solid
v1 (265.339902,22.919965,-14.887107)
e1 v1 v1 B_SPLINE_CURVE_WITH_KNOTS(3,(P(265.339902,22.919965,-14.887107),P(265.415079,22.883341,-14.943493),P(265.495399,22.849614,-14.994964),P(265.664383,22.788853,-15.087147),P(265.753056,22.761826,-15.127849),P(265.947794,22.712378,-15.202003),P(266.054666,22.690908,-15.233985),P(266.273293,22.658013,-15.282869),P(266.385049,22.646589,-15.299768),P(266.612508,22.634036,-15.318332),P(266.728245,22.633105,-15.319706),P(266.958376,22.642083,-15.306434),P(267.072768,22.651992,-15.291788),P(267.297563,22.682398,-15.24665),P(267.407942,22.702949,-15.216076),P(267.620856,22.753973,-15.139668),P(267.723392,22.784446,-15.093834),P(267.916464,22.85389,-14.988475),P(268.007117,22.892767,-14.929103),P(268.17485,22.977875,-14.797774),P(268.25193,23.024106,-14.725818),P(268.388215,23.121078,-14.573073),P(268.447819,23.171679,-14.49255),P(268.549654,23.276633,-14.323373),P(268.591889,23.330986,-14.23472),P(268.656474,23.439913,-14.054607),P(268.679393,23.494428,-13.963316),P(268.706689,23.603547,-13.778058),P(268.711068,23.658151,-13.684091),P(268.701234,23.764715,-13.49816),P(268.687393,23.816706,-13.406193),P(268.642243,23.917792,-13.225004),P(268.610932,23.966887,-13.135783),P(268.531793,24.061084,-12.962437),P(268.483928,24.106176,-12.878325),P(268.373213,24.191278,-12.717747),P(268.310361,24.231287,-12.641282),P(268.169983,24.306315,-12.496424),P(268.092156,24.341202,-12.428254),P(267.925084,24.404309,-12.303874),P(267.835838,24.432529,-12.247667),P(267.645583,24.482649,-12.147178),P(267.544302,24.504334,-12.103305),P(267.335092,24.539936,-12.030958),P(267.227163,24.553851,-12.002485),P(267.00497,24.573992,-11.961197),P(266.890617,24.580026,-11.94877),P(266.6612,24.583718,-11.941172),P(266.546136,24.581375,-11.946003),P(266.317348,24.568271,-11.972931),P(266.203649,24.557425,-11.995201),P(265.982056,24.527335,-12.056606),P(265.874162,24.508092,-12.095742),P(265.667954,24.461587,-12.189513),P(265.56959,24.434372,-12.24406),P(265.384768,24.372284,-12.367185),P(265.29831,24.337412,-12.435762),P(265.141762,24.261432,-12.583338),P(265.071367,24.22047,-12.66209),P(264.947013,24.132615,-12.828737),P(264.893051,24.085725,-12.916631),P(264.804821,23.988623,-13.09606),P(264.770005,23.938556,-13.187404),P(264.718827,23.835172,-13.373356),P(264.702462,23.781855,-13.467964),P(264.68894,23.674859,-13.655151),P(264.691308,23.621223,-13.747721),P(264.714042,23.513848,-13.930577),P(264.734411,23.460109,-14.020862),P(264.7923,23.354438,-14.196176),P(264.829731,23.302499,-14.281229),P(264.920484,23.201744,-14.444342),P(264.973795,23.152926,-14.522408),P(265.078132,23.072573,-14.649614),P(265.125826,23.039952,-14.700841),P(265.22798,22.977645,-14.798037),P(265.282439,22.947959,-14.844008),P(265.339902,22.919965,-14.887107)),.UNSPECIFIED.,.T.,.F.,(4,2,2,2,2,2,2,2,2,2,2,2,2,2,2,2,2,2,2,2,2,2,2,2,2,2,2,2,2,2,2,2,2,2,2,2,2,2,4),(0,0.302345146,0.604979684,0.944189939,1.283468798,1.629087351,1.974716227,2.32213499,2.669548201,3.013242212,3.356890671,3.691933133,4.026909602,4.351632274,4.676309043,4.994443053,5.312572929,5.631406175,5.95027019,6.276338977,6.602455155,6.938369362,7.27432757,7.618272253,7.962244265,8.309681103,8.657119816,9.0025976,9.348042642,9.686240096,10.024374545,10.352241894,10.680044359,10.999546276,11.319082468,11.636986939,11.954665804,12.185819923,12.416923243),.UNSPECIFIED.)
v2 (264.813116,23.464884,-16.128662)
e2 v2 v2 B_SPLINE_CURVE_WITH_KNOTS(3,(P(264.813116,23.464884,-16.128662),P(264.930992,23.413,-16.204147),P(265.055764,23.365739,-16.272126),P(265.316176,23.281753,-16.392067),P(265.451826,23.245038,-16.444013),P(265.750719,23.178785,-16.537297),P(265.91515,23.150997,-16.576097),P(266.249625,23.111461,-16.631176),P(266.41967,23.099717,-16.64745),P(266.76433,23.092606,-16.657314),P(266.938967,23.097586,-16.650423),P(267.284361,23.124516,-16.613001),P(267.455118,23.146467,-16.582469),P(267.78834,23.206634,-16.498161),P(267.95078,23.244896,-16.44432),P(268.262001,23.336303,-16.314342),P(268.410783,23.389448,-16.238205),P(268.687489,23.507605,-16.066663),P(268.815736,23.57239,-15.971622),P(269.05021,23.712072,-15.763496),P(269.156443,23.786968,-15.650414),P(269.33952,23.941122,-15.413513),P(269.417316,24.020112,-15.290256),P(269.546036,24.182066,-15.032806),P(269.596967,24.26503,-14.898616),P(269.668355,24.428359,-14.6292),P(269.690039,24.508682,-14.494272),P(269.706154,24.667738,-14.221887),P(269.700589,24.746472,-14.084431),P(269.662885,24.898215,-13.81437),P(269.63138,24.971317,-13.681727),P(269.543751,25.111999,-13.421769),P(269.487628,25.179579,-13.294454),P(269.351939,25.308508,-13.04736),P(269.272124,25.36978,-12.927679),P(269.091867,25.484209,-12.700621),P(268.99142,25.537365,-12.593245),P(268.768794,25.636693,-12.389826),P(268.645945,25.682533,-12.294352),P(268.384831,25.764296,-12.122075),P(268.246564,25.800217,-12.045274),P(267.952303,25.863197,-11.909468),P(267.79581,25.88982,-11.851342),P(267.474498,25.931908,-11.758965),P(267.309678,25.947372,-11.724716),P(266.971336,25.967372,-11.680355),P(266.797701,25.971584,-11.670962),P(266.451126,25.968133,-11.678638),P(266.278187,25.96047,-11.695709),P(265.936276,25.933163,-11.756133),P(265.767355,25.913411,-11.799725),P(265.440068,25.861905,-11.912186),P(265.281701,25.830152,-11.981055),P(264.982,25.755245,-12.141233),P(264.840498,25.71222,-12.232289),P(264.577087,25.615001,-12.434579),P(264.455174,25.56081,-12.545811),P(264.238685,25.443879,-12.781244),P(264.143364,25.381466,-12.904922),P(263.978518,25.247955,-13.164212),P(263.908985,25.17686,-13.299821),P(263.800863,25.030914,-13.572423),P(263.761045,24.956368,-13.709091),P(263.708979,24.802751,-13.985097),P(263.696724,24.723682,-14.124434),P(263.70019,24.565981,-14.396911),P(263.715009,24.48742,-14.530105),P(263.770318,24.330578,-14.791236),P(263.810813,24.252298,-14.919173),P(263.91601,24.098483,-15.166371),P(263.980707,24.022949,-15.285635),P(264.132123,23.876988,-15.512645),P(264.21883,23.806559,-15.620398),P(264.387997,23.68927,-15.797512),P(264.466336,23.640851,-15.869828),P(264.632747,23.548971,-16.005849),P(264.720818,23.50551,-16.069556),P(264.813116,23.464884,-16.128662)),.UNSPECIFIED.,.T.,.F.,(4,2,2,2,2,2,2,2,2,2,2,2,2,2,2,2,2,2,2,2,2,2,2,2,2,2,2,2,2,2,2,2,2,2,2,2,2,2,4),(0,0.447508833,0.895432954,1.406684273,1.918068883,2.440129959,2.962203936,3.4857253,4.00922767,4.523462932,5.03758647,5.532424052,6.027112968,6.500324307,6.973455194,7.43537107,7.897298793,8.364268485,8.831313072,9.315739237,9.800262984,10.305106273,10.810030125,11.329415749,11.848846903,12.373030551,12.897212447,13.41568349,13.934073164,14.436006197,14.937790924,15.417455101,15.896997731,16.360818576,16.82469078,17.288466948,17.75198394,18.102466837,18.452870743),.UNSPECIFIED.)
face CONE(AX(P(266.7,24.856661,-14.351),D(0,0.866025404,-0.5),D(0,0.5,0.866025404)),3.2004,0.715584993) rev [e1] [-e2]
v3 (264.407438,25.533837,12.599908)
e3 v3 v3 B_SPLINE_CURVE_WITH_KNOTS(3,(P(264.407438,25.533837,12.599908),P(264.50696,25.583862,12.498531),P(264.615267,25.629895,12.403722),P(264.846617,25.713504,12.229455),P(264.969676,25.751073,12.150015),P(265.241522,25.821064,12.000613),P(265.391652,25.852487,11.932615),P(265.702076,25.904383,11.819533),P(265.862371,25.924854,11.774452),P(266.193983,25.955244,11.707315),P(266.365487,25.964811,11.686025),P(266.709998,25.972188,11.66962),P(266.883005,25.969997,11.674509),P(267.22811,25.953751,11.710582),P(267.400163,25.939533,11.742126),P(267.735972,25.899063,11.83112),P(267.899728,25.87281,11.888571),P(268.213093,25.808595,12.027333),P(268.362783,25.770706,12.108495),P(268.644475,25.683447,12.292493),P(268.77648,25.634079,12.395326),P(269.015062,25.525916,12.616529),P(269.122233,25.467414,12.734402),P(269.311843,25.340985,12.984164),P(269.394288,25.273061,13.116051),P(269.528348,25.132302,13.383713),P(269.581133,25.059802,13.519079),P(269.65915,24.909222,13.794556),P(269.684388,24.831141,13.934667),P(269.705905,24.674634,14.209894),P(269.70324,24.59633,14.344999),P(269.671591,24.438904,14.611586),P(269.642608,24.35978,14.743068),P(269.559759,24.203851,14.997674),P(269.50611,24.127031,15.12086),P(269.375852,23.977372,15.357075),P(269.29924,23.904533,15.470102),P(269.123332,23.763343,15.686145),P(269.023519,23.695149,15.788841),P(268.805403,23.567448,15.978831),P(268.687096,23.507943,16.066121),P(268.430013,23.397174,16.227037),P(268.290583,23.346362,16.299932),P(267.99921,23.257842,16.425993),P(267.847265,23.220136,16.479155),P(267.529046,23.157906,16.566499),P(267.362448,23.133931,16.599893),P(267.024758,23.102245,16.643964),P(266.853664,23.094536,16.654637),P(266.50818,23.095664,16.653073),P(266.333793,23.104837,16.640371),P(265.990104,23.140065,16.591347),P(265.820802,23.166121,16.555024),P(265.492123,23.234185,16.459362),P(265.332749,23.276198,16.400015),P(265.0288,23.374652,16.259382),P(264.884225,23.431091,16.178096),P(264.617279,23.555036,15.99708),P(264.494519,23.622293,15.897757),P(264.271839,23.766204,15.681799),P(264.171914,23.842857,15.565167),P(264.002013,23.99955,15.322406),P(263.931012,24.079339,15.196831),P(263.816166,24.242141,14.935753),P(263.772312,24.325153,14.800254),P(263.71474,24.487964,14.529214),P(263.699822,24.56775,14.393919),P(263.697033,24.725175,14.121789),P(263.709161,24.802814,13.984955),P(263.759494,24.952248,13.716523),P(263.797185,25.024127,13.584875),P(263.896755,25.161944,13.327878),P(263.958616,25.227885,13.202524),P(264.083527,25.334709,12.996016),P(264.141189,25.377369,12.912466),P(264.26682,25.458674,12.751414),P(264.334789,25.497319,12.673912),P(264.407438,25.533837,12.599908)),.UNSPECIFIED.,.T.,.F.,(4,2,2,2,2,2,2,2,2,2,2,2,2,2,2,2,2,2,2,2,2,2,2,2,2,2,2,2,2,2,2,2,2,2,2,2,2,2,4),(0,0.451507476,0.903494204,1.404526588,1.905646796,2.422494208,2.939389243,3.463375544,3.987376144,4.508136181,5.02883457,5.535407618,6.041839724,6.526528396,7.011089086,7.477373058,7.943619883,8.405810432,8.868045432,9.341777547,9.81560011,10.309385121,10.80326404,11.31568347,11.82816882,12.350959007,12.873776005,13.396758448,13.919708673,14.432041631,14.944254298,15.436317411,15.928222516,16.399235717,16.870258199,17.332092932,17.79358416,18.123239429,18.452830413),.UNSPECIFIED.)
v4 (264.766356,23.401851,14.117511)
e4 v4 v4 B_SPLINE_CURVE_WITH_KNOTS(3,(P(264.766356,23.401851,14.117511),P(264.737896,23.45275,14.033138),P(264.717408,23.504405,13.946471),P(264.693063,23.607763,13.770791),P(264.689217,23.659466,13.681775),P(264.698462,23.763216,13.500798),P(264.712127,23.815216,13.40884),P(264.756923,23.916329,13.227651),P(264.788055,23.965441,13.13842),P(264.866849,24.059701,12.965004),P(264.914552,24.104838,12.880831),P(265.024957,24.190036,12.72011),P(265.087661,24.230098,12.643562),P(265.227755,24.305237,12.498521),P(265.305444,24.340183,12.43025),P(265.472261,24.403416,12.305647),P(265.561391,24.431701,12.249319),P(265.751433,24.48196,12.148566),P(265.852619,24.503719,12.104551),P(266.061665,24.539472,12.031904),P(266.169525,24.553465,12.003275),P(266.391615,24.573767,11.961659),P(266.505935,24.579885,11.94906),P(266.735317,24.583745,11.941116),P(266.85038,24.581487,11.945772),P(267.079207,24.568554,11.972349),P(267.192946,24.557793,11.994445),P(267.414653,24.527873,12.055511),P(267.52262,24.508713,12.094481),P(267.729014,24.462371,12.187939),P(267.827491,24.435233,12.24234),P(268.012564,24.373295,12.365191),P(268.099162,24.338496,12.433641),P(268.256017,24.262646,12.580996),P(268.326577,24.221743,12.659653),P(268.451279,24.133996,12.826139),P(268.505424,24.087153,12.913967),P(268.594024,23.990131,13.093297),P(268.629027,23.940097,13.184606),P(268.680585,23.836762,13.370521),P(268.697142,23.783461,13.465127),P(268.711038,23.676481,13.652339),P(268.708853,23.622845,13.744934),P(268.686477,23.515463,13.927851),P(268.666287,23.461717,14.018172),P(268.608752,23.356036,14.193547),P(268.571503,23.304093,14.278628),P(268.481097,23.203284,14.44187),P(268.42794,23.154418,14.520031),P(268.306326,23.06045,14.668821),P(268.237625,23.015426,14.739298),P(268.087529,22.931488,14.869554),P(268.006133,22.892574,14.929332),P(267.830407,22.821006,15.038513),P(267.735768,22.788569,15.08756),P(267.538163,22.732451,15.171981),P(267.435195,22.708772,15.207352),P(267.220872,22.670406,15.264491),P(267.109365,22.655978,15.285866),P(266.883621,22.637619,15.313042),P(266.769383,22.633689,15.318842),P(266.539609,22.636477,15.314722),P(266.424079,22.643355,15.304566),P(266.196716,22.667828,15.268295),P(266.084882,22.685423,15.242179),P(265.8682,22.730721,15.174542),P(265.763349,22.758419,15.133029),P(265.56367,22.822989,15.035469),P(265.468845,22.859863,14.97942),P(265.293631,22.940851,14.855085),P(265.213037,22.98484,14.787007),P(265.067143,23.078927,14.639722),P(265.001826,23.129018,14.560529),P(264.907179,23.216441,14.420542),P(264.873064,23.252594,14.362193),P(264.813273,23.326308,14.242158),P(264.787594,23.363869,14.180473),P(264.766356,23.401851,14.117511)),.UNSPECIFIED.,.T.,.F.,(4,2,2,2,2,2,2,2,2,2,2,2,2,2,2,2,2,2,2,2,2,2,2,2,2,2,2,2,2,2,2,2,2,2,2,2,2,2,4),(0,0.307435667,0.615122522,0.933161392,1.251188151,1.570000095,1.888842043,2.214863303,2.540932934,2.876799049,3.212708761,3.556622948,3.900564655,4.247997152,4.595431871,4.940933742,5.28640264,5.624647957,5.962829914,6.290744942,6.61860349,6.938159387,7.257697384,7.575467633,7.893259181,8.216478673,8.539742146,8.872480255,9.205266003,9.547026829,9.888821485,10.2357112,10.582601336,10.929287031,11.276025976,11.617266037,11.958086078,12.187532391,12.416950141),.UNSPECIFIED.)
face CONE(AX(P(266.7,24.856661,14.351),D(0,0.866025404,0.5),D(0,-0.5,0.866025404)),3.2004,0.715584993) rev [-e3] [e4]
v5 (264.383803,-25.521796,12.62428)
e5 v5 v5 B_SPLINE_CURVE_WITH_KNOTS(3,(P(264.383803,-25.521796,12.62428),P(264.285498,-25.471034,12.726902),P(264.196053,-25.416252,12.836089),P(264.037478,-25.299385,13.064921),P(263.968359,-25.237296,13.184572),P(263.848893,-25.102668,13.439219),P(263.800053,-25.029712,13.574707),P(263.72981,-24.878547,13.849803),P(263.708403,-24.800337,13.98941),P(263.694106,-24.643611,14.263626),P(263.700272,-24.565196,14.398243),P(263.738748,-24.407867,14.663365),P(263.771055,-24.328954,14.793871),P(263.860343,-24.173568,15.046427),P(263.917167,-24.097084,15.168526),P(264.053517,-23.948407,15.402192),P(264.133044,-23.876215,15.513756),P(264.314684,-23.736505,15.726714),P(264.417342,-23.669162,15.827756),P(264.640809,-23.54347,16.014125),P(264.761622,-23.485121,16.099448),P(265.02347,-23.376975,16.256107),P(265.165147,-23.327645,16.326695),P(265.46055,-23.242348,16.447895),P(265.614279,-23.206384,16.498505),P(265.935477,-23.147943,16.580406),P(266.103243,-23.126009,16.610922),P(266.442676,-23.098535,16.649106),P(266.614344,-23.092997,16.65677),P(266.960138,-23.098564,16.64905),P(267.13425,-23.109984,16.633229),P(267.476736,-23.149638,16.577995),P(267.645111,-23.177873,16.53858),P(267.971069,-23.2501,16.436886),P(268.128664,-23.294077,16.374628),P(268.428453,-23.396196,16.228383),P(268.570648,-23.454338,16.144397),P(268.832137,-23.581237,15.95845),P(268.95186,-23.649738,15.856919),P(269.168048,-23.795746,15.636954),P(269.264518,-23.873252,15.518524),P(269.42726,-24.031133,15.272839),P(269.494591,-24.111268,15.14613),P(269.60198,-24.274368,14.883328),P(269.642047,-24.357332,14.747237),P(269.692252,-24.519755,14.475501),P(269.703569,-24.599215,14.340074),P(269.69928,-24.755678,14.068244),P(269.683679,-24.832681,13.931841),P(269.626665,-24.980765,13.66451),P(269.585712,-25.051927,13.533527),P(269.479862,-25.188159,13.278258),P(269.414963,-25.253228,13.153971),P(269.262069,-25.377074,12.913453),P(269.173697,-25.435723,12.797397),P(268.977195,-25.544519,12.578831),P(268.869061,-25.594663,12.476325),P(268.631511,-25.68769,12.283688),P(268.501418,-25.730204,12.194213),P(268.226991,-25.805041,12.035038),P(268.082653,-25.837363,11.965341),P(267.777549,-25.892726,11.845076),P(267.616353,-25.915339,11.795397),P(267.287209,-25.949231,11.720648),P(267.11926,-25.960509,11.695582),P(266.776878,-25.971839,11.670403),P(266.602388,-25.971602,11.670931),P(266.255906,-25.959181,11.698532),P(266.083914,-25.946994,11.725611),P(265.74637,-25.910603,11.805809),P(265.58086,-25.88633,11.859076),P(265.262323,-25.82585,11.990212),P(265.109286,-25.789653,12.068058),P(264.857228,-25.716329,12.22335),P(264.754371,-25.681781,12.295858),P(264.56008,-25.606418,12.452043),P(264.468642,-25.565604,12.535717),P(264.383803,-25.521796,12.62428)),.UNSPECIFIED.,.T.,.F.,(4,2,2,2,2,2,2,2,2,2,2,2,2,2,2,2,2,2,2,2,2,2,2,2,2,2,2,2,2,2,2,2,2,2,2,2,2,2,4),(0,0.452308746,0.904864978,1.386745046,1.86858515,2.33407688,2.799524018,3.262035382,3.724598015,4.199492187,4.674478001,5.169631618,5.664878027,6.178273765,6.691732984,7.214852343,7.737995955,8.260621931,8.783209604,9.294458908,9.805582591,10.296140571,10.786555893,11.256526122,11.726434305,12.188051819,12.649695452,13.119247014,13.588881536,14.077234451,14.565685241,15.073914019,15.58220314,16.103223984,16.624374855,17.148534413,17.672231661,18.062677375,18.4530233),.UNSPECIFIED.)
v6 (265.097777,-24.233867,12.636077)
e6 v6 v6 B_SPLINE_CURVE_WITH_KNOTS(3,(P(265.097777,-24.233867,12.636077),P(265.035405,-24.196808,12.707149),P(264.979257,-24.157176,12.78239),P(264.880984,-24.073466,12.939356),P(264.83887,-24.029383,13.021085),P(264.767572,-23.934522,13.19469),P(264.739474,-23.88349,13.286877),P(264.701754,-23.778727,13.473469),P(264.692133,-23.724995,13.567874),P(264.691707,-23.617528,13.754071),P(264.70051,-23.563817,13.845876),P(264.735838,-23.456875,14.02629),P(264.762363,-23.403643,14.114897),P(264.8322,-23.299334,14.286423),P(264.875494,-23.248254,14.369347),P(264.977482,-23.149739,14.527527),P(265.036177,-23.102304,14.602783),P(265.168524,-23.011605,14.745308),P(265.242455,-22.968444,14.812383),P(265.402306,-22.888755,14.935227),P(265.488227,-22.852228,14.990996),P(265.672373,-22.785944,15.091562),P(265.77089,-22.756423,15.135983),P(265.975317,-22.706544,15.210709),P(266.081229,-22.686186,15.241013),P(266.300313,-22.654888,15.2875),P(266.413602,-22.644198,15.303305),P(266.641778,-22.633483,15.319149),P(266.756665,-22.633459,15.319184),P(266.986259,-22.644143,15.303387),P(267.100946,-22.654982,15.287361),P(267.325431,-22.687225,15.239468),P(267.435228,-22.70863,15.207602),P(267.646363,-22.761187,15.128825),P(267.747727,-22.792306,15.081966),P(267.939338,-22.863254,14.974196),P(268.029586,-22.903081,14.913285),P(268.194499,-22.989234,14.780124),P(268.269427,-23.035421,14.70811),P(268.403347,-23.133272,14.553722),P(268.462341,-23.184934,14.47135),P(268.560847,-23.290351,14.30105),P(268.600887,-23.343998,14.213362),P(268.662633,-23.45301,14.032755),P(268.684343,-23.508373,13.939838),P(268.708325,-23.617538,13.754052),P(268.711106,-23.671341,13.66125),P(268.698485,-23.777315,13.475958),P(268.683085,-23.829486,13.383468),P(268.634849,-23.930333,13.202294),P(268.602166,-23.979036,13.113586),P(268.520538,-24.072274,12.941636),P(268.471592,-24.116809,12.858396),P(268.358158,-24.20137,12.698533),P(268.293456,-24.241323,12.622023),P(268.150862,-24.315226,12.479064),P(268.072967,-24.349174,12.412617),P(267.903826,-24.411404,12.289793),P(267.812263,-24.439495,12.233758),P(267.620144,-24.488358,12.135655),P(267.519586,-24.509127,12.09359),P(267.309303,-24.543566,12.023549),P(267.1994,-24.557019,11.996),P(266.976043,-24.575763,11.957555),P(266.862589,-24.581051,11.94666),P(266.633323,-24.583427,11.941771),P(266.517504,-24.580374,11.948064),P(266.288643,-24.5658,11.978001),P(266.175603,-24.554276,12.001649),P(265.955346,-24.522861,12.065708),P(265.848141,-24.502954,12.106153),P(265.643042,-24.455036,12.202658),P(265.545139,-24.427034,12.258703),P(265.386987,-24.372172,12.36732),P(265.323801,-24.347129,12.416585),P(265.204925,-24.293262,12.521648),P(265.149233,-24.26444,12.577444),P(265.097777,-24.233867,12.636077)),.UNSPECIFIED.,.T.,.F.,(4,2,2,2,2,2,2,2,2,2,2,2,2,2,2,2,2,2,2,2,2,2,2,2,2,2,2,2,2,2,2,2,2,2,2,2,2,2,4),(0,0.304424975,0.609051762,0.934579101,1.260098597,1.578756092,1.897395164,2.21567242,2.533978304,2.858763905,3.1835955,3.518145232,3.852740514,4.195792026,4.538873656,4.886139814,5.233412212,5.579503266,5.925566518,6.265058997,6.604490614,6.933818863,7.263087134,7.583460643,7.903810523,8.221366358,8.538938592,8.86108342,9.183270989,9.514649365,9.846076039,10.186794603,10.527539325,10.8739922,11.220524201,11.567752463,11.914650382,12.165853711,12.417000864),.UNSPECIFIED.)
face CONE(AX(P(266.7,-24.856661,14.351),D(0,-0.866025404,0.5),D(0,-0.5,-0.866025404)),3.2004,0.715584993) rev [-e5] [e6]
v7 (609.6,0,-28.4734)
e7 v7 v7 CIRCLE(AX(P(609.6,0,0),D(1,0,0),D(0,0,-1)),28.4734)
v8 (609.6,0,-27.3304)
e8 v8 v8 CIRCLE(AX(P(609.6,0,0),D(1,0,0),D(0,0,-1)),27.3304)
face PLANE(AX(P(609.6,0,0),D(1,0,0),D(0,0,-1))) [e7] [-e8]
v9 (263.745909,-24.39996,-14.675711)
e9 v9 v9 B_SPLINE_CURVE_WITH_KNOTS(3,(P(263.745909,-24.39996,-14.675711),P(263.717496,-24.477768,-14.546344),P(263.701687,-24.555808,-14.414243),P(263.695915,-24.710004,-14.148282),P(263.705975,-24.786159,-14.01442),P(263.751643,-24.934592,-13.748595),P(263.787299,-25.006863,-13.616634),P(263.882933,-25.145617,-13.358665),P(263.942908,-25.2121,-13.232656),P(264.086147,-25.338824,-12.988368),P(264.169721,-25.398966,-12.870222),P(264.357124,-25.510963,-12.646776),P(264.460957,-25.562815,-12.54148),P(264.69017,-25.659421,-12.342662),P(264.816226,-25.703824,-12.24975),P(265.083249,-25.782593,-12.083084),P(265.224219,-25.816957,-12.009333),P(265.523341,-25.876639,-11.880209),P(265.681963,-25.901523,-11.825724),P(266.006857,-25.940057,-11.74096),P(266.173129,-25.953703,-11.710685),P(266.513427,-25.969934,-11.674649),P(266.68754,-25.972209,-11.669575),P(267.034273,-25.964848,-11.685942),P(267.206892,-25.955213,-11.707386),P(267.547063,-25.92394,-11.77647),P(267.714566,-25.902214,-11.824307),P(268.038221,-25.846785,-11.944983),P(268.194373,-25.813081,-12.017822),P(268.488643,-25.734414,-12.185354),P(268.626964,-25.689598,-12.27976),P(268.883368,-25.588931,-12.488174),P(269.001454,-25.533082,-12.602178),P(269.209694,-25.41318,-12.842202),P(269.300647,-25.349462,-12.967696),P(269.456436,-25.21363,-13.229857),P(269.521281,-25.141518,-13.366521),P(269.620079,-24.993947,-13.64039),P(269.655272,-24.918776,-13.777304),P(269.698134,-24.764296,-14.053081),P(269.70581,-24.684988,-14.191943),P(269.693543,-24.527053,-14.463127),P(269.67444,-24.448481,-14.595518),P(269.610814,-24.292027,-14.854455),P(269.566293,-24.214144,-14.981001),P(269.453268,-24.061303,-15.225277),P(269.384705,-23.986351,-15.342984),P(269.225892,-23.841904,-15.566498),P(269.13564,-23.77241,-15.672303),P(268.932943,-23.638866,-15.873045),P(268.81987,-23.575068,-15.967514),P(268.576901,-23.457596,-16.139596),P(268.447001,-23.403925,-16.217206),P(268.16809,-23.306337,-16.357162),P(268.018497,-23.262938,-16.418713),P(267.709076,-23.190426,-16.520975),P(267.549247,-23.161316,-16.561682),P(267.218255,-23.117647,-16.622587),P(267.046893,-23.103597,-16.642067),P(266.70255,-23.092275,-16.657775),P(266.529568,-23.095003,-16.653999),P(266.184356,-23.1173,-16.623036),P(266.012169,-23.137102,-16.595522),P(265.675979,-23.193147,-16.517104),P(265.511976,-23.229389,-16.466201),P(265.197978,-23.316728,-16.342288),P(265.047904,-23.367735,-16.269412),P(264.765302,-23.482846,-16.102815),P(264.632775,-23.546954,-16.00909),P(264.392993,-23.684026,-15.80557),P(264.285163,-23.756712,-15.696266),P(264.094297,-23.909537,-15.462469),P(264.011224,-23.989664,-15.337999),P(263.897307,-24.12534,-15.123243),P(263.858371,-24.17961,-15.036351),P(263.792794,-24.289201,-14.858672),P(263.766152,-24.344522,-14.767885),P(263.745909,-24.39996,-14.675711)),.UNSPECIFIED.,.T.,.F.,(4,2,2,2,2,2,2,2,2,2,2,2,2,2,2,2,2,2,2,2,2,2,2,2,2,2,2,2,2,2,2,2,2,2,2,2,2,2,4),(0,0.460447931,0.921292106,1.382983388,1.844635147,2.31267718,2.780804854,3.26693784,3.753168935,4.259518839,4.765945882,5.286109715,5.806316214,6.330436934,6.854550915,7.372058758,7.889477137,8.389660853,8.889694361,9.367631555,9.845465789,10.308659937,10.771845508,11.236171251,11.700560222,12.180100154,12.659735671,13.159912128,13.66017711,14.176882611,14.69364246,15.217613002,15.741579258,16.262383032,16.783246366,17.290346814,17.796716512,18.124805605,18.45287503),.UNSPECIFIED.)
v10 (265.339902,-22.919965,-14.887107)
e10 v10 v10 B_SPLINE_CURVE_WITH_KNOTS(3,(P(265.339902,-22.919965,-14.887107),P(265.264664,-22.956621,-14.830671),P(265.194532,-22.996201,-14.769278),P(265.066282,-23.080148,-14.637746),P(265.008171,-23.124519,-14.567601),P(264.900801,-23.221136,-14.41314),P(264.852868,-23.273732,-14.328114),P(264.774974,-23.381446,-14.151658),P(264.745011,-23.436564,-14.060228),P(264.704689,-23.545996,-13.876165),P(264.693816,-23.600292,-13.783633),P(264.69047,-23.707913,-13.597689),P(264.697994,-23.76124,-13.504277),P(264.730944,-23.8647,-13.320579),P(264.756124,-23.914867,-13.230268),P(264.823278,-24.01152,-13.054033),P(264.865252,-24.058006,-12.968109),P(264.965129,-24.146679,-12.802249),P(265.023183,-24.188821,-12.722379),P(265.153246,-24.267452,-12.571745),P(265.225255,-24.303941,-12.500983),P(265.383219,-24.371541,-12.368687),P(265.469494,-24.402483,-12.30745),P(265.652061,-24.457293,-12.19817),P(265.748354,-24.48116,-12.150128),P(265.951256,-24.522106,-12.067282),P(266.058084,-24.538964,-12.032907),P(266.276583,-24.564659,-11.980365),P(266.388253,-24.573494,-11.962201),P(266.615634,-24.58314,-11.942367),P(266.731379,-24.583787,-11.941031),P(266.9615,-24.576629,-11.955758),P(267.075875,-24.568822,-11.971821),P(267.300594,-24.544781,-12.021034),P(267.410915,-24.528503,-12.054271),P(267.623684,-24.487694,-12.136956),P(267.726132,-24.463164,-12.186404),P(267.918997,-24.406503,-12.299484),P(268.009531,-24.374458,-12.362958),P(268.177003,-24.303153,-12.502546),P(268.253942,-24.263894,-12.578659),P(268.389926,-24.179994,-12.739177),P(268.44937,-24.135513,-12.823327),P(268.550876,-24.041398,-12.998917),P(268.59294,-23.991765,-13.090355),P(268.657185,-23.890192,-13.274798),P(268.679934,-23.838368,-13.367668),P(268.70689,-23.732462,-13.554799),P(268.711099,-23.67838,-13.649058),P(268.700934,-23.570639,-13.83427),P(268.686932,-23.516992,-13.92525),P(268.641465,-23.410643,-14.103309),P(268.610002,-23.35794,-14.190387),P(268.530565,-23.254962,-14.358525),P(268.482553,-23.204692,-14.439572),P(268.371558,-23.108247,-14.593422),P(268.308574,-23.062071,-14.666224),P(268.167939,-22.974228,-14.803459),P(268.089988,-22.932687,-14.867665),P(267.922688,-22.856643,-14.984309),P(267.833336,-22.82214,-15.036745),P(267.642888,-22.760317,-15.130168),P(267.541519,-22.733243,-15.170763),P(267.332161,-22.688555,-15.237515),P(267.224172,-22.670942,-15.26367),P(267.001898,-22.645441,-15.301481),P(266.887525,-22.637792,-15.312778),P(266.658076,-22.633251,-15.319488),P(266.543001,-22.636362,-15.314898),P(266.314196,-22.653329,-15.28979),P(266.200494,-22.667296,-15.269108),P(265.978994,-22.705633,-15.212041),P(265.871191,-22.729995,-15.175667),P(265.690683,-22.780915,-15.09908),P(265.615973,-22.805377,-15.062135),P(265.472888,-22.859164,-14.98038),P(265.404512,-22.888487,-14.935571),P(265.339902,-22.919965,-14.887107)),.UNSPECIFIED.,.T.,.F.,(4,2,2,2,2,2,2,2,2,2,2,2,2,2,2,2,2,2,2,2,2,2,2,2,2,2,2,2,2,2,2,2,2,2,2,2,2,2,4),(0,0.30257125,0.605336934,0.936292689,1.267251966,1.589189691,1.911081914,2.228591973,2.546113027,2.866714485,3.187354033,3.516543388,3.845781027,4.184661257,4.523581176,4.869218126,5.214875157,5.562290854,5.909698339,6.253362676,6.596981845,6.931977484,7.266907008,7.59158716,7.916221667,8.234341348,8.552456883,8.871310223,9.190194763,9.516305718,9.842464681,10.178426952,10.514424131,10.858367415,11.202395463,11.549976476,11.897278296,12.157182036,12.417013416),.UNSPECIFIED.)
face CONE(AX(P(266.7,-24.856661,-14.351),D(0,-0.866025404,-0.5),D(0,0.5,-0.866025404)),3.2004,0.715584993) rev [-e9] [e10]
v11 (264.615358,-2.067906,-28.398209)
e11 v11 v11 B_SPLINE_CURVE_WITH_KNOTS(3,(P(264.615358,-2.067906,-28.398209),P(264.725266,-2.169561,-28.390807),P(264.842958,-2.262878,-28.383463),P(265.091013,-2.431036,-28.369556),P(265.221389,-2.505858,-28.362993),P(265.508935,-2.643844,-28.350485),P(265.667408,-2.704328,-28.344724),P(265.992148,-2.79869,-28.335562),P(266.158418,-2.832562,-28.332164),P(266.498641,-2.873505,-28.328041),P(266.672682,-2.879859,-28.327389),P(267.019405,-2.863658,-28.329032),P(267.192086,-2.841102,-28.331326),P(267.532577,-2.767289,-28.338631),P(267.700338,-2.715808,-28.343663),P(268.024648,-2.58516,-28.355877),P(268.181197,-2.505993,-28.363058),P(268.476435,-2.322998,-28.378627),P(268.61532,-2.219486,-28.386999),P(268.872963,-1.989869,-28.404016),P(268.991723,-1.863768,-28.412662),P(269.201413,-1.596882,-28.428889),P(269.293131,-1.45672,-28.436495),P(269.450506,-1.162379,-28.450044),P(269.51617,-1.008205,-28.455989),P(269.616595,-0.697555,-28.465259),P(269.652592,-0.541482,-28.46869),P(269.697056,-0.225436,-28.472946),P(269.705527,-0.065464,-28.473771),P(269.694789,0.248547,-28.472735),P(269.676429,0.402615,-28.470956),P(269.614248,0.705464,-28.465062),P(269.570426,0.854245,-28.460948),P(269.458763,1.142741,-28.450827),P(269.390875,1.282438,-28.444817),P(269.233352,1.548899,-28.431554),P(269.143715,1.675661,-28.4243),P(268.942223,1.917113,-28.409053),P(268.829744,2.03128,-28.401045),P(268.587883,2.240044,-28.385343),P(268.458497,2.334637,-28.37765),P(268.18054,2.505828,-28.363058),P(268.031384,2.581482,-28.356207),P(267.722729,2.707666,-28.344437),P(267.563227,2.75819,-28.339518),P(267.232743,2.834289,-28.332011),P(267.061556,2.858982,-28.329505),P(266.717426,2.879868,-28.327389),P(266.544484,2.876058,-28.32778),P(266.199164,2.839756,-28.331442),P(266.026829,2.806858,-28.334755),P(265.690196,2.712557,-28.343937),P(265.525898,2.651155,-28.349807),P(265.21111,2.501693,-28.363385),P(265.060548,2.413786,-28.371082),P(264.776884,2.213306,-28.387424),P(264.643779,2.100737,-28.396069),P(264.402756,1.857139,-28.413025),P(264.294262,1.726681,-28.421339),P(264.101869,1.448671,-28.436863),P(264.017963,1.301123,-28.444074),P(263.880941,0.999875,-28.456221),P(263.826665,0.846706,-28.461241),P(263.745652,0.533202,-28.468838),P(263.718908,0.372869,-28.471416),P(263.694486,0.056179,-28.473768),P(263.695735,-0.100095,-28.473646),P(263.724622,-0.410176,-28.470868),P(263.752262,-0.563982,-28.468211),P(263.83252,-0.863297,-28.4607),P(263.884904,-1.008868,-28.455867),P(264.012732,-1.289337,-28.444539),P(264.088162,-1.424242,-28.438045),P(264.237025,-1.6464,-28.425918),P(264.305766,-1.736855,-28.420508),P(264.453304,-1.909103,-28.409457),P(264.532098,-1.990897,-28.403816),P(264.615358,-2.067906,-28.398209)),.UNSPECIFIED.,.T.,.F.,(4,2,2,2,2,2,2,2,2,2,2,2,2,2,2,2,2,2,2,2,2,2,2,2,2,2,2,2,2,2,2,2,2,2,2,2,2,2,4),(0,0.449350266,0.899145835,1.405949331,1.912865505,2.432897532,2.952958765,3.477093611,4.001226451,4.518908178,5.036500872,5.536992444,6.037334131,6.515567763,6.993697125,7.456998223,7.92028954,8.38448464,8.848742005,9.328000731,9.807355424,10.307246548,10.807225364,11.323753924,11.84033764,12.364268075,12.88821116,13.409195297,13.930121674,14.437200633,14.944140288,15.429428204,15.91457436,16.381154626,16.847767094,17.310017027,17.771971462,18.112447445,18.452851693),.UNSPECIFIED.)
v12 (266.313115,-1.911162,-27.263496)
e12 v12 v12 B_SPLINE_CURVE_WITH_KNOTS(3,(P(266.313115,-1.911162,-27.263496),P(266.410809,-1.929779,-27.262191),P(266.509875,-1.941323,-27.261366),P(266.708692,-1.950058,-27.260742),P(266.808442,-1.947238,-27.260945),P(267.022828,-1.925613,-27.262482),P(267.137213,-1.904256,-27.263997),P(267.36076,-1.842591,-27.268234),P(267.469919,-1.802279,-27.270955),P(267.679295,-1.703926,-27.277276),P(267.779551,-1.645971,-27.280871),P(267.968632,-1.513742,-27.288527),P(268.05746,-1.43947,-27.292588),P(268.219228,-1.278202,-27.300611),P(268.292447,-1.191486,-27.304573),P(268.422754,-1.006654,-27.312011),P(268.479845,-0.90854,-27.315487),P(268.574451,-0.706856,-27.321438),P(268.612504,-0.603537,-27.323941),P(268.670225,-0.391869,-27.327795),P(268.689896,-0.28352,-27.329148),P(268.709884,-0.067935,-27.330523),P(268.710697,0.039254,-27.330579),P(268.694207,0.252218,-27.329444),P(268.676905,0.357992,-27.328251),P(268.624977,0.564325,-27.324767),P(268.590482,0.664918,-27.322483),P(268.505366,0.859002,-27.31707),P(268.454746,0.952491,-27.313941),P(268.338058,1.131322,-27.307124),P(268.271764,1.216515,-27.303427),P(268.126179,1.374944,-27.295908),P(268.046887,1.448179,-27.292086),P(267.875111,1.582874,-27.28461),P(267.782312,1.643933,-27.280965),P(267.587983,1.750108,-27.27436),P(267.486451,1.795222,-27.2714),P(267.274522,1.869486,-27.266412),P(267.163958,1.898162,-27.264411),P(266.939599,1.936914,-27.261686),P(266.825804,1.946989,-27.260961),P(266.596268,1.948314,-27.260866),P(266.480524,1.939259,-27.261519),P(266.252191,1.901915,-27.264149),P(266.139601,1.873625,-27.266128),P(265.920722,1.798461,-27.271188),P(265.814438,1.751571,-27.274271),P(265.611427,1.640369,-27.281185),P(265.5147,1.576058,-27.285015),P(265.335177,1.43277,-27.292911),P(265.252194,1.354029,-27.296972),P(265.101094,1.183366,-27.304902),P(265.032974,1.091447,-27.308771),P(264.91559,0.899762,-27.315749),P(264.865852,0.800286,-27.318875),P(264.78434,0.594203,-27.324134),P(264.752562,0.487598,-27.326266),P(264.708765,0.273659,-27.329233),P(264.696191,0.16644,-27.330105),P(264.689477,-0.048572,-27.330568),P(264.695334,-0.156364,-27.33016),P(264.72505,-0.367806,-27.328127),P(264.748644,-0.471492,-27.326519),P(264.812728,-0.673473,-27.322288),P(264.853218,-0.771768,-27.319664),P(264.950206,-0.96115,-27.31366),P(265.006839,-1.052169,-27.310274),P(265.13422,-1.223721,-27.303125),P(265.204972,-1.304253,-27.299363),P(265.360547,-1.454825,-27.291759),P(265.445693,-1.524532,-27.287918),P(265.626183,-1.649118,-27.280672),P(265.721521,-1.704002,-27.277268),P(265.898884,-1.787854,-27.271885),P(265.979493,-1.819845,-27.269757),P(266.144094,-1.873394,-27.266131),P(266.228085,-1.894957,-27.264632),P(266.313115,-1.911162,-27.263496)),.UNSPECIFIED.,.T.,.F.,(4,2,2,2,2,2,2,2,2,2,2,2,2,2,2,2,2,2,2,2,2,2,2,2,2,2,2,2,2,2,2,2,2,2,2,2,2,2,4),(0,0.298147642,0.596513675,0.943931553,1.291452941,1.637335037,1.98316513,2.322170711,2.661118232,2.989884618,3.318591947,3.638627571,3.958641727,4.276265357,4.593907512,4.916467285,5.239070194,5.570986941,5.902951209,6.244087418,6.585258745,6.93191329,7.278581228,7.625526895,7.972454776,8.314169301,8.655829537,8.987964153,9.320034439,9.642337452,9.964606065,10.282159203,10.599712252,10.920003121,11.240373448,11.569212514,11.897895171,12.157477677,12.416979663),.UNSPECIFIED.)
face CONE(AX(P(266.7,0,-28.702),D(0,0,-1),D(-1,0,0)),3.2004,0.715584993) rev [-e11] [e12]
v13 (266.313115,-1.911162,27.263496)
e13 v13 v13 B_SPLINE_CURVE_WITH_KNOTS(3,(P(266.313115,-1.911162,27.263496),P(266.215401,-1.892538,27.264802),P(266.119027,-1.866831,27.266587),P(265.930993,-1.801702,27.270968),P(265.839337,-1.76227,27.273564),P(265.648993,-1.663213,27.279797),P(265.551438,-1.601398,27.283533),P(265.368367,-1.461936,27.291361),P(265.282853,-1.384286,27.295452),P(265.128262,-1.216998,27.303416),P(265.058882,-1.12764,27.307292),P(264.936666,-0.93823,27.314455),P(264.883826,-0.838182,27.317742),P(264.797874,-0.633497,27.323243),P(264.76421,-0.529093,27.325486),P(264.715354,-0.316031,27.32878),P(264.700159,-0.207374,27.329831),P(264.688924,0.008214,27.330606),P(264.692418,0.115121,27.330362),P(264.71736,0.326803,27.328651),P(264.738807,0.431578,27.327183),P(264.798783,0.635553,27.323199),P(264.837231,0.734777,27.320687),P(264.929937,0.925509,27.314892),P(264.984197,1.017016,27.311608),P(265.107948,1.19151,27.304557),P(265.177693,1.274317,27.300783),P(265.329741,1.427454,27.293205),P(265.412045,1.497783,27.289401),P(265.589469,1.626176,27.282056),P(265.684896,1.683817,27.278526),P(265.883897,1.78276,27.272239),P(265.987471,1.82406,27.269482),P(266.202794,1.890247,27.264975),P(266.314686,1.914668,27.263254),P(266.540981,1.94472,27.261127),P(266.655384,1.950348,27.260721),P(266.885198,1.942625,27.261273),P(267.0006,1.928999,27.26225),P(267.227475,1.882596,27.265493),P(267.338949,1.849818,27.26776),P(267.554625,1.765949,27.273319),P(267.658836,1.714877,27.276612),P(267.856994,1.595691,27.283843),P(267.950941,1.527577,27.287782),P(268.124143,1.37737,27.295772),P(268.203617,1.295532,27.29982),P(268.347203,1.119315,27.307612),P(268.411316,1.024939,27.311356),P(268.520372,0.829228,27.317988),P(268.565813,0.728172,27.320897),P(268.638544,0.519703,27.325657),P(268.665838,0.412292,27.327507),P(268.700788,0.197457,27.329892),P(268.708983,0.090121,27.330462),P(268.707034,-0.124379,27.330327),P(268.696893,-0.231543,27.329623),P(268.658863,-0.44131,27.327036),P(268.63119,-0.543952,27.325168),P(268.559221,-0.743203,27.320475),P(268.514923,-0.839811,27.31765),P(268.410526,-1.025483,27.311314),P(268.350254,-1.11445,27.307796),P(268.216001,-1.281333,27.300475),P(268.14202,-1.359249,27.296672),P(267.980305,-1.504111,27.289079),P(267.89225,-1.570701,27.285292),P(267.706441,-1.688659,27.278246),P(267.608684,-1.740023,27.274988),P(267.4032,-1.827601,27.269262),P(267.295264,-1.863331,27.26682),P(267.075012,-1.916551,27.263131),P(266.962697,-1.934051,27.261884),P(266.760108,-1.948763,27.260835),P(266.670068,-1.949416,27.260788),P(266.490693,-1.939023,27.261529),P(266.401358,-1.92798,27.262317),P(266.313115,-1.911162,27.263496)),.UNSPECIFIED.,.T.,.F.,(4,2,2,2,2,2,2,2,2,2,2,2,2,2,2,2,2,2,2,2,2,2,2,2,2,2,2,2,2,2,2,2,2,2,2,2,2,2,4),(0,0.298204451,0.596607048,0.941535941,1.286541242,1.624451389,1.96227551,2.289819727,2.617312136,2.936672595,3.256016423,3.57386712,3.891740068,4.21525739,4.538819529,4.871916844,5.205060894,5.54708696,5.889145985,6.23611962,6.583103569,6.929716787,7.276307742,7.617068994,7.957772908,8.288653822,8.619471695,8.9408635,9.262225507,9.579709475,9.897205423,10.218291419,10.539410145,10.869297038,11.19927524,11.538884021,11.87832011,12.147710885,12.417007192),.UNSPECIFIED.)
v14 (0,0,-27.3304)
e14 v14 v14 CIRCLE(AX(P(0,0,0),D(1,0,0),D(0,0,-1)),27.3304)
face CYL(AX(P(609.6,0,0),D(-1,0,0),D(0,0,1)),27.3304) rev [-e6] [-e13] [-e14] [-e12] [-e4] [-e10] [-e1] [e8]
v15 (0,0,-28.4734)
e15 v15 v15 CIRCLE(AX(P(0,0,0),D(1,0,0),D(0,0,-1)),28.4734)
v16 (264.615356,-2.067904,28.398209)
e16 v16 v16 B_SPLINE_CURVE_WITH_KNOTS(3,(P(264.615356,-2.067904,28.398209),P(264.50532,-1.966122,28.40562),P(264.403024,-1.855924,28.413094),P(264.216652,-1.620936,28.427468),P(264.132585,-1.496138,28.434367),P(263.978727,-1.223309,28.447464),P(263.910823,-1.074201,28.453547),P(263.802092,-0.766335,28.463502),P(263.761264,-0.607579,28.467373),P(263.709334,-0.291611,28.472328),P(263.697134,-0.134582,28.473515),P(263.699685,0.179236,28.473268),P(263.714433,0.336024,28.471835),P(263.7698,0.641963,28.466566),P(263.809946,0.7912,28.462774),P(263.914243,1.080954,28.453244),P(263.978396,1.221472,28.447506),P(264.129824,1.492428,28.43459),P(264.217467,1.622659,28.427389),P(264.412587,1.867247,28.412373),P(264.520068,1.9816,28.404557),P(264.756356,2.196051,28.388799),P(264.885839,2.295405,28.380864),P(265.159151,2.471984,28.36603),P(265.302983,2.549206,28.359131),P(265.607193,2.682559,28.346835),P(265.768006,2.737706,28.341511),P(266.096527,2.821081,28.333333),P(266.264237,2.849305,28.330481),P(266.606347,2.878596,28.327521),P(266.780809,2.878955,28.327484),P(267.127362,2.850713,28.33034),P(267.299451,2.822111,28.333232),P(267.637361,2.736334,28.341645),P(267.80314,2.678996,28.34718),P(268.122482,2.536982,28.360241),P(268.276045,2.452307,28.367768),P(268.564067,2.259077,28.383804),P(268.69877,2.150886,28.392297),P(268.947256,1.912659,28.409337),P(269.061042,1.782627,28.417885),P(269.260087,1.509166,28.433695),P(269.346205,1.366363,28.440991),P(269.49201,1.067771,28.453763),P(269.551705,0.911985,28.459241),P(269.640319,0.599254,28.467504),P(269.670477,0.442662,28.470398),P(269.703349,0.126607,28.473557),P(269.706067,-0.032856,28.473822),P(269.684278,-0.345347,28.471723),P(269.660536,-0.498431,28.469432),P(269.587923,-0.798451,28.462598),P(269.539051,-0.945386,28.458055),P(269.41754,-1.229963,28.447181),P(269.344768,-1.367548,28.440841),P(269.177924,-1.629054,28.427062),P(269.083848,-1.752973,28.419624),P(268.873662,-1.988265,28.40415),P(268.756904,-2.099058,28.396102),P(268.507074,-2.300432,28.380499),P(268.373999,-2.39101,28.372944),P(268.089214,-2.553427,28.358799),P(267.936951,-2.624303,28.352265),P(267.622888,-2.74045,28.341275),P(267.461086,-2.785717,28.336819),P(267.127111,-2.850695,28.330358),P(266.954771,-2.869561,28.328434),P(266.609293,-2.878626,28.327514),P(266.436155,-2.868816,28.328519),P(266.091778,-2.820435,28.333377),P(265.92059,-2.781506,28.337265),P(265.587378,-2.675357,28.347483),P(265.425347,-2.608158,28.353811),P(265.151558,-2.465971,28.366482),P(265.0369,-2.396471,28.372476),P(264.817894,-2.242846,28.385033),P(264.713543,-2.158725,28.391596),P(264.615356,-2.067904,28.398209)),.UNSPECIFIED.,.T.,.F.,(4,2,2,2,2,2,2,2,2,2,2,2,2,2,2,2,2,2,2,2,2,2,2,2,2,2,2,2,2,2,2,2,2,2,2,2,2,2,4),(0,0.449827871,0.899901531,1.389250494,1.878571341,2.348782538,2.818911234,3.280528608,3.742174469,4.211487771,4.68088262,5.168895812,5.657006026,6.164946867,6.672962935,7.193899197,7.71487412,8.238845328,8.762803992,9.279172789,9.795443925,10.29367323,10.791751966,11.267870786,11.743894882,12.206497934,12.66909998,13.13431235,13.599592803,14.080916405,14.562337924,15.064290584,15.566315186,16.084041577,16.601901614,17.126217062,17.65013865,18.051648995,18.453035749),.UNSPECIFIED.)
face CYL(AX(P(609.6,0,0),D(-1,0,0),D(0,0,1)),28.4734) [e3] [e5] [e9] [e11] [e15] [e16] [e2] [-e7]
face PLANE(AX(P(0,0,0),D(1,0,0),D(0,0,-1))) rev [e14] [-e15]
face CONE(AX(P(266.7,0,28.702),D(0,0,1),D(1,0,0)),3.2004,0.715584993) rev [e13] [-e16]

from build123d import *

# Parameters (mm, degrees)
SKETCH1_R           = 28.4734
SKETCH1_R_2         = 27.3304
BOSS_EXTRUDE1_DEPTH = 609.6
CIRPATTERN1_COUNT   = 6


# Read off the part's stored shape, not the designer's step: CSK for #5 Flat Head Machine Screw1
with BuildPart() as part:
    # Sketch1 → Boss-Extrude1 (new body)
    with BuildSketch(Plane(origin=(0, 0, 0), x_dir=(0, 0, -1), z_dir=(1, 0, 0))):
        with Locations(Location((0, 0, 0), (0, 0, 180))):
            Circle(SKETCH1_R)
        with Locations(Location((0, 0, 0), (0, 0, 180))):
            Circle(SKETCH1_R_2, mode=Mode.SUBTRACT)
    extrude(amount=BOSS_EXTRUDE1_DEPTH)

    # CSK for #5 Flat Head Machine Screw1 outl → CSK for #5 Flat Head Machine Screw1 (revolve, cut)
    with BuildSketch(Plane(origin=(266.7, 0, 0), x_dir=(1, 0, 0), z_dir=(0, -1, 0))):
        Polygon((3.001715891, 28.473440077), (0, 28.473440077), (0, 27.260877218), (1.947651078, 27.260877218), align=None)
    csk_for_5_flat_head_machine_screw1 = revolve(axis=Axis((266.7, 0, 0), (0, 0, 1)), mode=Mode.SUBTRACT)

    # CirPattern1: CSK for #5 Flat Head Machine Screw1 ×6 about axis
    cirpattern1_axis = Axis((609.6, 0, 0), (-1, 0, 0))
    for i in range(1, CIRPATTERN1_COUNT):
        add(csk_for_5_flat_head_machine_screw1.rotate(cirpattern1_axis, i * 360 / CIRPATTERN1_COUNT), mode=Mode.SUBTRACT)


solid = part.part
